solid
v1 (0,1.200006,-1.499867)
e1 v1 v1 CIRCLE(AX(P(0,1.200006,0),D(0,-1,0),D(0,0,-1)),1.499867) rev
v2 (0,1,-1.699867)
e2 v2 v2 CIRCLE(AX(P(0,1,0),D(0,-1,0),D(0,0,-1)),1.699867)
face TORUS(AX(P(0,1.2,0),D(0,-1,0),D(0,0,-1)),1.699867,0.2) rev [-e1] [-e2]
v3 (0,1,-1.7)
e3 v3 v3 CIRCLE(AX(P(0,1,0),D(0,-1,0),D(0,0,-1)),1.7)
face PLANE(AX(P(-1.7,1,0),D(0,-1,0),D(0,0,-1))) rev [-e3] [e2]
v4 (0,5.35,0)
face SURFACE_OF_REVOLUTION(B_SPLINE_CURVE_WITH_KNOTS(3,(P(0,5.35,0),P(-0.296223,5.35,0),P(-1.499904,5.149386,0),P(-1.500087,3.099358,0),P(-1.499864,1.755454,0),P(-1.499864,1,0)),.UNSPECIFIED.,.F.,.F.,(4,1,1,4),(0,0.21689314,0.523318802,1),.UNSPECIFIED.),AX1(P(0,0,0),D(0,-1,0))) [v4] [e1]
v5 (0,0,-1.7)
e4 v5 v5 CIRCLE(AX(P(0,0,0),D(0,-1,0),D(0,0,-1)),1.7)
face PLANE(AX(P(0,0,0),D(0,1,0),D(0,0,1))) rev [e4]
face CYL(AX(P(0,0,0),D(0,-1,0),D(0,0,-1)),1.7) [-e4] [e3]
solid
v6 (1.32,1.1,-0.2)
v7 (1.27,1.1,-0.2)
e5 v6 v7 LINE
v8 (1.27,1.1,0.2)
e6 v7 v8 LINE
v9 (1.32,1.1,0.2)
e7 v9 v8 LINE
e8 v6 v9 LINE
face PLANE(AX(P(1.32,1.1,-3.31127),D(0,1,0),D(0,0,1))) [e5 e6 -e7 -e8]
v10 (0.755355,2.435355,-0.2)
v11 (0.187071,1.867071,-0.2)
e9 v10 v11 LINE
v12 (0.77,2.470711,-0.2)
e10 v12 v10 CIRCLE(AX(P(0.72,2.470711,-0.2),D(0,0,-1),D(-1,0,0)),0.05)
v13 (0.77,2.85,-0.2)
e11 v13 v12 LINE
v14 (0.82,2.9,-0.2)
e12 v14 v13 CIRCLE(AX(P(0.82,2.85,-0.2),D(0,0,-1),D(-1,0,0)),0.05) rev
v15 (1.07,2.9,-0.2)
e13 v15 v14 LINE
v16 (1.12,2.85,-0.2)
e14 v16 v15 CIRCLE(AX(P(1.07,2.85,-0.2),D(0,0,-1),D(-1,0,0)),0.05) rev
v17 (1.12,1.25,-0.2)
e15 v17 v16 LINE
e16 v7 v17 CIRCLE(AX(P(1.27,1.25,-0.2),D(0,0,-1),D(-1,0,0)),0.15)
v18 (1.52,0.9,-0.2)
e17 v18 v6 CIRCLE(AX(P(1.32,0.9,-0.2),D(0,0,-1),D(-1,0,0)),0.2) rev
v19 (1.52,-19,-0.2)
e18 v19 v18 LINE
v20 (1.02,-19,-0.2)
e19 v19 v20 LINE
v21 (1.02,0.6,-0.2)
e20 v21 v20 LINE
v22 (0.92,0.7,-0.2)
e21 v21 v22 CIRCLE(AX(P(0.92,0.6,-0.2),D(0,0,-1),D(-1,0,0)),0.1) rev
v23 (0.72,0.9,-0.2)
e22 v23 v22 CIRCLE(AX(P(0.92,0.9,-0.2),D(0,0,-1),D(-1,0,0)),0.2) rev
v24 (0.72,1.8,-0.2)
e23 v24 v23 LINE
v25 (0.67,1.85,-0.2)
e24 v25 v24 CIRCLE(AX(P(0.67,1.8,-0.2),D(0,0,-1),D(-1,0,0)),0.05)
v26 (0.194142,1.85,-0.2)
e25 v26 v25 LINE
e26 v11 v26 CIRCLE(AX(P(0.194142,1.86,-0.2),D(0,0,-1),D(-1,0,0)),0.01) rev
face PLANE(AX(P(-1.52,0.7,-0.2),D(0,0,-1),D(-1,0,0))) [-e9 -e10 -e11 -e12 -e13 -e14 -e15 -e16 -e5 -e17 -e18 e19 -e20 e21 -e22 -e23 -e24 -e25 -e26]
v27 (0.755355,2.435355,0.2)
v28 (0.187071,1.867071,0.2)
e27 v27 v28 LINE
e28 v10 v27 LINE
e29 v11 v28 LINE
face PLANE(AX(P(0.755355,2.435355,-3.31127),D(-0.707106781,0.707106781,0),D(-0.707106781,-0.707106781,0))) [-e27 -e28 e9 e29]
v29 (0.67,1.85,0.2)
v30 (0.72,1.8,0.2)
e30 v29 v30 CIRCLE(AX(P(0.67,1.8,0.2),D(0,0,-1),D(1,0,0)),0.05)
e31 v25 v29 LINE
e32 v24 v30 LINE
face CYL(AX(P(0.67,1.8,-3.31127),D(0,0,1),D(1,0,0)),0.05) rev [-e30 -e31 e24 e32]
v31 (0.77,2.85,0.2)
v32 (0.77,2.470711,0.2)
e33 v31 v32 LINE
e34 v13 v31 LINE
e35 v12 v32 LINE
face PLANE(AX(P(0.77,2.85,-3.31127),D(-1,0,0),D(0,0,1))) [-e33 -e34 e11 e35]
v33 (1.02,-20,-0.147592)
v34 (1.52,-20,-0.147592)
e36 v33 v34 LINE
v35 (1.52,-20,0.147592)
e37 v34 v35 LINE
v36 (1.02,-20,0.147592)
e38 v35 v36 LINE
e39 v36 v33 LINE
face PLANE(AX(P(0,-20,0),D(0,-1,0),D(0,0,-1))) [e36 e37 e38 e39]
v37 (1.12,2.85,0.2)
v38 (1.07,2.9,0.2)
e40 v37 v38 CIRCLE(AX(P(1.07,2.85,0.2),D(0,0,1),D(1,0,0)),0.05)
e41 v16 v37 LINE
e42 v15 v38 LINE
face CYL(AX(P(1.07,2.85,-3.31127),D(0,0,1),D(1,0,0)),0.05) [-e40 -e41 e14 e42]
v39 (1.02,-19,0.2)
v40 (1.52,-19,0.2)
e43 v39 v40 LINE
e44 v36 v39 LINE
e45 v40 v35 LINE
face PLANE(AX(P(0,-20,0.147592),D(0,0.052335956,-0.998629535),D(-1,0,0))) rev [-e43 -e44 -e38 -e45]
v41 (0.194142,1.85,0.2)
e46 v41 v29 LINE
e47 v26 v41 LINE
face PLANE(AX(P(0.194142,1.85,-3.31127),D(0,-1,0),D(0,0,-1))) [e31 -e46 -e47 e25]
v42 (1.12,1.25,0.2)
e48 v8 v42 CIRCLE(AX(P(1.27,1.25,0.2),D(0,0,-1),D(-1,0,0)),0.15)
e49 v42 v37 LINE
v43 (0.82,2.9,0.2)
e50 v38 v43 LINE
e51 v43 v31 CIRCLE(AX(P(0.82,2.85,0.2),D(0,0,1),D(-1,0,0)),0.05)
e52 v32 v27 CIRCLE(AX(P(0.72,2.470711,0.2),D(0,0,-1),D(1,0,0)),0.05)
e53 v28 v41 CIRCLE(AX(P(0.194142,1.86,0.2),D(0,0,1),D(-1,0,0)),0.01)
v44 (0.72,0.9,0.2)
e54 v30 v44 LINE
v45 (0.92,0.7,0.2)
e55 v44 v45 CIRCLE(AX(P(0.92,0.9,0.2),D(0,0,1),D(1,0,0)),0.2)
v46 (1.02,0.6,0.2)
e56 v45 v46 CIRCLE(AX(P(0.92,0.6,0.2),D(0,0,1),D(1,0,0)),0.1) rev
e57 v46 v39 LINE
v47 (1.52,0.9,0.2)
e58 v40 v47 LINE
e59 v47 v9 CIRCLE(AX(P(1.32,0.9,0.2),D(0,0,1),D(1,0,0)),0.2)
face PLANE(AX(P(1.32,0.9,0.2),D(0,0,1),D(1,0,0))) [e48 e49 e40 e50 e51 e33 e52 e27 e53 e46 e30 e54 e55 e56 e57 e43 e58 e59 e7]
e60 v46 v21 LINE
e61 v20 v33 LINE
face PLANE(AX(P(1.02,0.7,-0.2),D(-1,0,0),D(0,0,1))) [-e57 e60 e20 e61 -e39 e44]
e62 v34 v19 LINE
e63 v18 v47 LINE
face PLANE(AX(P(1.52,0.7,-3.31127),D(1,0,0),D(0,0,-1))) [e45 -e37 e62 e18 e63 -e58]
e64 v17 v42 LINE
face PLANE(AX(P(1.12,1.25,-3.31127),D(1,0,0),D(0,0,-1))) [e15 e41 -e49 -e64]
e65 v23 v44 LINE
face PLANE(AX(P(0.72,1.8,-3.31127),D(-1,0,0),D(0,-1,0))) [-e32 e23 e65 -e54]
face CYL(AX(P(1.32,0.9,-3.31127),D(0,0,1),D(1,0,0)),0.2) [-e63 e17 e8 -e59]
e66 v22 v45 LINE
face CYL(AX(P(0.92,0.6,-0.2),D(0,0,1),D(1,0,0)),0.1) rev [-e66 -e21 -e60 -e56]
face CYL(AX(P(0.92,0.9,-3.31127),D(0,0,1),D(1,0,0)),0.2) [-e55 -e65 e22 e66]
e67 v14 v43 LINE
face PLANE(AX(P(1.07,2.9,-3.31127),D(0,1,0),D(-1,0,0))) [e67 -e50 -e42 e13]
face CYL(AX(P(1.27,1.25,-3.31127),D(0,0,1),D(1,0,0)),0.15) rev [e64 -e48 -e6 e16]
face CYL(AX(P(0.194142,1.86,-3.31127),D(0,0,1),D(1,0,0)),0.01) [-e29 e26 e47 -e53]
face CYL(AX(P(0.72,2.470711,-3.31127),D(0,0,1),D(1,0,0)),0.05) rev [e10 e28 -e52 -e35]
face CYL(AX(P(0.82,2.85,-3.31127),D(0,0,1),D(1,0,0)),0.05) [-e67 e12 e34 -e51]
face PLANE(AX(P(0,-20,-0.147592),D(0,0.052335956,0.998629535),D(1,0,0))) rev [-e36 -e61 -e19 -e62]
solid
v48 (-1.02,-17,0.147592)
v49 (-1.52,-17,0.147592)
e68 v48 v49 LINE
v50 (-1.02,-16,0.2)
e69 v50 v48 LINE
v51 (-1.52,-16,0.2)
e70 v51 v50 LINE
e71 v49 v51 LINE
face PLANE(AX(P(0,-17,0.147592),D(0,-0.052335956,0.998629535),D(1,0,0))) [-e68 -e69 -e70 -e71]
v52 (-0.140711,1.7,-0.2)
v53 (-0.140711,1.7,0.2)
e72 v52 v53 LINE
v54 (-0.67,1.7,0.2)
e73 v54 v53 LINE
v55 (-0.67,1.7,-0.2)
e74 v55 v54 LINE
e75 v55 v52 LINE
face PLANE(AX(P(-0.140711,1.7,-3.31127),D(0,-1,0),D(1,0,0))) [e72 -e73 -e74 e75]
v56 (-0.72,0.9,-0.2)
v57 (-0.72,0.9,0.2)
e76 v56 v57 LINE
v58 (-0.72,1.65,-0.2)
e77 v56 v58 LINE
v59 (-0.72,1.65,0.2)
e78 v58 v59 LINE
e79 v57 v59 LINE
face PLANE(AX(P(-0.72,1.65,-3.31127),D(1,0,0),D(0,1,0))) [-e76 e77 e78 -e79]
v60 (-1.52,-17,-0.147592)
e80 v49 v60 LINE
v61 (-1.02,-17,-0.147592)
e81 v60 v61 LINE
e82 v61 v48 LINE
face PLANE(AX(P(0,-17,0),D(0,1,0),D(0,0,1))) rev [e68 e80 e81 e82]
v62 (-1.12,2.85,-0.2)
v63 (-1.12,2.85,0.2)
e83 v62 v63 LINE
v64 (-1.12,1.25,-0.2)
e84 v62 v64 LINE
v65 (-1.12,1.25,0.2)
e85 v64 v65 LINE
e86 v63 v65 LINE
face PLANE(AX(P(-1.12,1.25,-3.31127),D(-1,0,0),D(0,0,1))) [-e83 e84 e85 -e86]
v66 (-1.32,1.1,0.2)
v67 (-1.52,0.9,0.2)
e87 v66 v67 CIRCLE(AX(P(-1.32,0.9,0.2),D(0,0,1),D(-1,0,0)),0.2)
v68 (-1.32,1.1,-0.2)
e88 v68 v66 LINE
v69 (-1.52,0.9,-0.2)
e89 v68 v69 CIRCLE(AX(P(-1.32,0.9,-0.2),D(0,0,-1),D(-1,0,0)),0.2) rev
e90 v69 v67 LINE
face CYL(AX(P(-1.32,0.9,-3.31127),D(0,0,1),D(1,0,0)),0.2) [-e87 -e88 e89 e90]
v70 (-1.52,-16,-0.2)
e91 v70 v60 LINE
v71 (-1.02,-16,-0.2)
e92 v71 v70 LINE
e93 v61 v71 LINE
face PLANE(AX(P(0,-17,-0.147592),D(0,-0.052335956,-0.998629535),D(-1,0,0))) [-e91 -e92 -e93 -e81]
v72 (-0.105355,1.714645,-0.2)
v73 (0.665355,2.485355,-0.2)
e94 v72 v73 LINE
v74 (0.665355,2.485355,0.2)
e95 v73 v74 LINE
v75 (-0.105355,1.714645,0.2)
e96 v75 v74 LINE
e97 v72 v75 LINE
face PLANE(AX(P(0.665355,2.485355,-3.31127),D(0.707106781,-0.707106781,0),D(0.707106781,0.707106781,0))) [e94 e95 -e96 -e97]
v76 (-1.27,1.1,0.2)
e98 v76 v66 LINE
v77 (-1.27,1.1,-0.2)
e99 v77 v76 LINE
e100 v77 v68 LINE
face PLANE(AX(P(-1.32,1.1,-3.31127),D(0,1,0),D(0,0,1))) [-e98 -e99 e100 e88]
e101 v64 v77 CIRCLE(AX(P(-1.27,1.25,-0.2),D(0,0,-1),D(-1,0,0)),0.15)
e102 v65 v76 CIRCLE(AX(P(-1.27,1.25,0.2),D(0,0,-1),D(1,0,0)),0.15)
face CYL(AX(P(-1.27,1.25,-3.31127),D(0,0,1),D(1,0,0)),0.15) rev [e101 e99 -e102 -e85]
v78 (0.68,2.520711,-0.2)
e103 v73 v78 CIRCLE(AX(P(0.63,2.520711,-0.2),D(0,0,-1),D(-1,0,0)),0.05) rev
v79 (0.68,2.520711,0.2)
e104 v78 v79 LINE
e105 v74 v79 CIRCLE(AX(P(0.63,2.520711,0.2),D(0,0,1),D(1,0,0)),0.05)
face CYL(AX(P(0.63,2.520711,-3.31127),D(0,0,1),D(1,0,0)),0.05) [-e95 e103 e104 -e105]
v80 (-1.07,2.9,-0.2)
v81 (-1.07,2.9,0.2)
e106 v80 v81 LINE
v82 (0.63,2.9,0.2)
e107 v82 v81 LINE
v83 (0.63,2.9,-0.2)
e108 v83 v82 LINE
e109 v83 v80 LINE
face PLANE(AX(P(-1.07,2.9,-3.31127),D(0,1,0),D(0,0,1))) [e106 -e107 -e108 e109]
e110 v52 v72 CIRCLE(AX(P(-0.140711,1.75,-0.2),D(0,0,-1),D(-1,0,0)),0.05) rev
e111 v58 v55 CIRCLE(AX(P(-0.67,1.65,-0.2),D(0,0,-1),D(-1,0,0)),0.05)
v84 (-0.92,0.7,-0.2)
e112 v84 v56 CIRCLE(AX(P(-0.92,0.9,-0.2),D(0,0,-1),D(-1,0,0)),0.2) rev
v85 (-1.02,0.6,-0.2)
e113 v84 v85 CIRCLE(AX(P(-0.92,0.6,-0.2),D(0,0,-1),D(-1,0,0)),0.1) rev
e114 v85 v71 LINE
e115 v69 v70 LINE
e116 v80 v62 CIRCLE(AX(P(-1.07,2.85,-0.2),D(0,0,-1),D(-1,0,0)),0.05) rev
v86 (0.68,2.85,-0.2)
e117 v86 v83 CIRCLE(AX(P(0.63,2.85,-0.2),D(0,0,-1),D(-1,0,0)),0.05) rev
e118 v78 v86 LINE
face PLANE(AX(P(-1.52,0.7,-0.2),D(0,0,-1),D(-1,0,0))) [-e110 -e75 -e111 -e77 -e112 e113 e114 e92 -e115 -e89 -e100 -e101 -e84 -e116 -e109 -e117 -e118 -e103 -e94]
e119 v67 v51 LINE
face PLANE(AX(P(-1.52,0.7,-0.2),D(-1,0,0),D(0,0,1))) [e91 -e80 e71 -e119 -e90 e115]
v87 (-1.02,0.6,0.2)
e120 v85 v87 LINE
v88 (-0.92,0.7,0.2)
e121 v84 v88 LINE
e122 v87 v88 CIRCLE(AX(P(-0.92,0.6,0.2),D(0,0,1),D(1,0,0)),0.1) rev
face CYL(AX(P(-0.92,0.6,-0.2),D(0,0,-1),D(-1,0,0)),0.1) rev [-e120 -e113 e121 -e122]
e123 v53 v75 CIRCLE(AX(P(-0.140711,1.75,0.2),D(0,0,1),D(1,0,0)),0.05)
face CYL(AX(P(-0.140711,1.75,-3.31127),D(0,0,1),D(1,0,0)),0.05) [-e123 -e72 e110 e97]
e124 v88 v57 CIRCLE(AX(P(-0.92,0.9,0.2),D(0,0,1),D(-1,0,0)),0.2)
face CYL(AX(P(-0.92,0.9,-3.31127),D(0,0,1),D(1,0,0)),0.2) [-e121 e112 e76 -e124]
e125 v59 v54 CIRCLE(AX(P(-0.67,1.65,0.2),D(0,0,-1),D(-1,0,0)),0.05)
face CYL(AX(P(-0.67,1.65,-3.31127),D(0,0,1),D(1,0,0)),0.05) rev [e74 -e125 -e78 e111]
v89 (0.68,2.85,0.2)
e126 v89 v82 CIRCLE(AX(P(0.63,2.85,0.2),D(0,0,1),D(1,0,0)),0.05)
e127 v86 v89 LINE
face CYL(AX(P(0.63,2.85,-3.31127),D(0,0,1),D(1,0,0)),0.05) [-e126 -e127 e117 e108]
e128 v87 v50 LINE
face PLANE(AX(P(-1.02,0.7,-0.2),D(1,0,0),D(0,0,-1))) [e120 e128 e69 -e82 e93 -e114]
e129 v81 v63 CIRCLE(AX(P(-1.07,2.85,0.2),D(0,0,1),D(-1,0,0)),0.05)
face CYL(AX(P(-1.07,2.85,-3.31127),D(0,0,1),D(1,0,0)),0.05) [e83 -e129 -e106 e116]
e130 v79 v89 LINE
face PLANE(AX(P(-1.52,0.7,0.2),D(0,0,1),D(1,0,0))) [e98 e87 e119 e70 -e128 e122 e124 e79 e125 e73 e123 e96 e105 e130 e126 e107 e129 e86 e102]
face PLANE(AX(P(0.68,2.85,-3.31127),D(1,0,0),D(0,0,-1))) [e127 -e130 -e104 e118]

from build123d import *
from OCP.BRepFilletAPI import BRepFilletAPI_MakeChamfer

# Parameters (mm, degrees)
FILLET1_R                  = 0.2
BOSS_EXTRUDE1_DEPTH        = 17
BOSS_EXTRUDE1_DEPTH_BACK   = 0.7
SKETCH2_W                  = 0.5
SKETCH2_H                  = 0.4
BOSS_EXTRUDE1_2_DEPTH      = 17
BOSS_EXTRUDE1_2_DEPTH_BACK = 0.7
SKETCH3_W                  = 0.5
SKETCH3_H                  = 0.4
BOSS_EXTRUDE2_DEPTH        = 3
CHAMFER1_SIZE              = 1
CHAMFER1_SIZE2             = 0.052407779
CHAMFER2_SIZE              = 1
CHAMFER2_SIZE2             = 0.052407779
BOSS_EXTRUDE3_DEPTH        = 0.4
BOSS_EXTRUDE3_2_DEPTH      = 0.4
FILLET2_R                  = 0.1
FILLET3_R                  = 0.1


with BuildPart() as part:
    # Sketch1 → Revolve2 (revolve)
    with BuildSketch(Plane.XY, mode=Mode.PRIVATE) as revolve2_sk:
        with BuildLine():
            Line((0, 0), (0, 5.35))
            add(Edge.make_bspline(
                [(0, 5.35), (-0.296223224, 5.35), (-1.499904297, 5.149386401), (-1.500087174, 3.099357507), (-1.49986439, 1.755454147), (-1.49986439, 1)],
                knots=[0, 0, 0, 0, 0.21689314, 0.523318802, 1, 1, 1, 1], degree=3))
            Line((-1.49986439, 1), (-1.7, 1))
            Line((-1.7, 1), (-1.7, 0))
            Line((-1.7, 0), (0, 0))
        make_face()
    revolve(revolve2_sk.sketch.rotate(Axis((0, 0, 0), (0, 1, 0)), 270), axis=Axis((0, 0, 0), (0, 1, 0)))

    # Fillet1
    fillet1_edges = [part.edges().sort_by_distance(p)[0] for p in [
        (0, 1, 1.49986439),
    ]]
    fillet(fillet1_edges, radius=FILLET1_R)


with BuildPart() as body_2:
    # Sketch2 → Boss-Extrude1 (new, two sides: drawn at the far end of the back side and taken through both)
    with BuildSketch(Plane.XZ.offset(-BOSS_EXTRUDE1_DEPTH_BACK)):
        with Locations((-1.27, 0)):
            Rectangle(SKETCH2_W, SKETCH2_H)
    extrude(amount=BOSS_EXTRUDE1_DEPTH + BOSS_EXTRUDE1_DEPTH_BACK)

    # Chamfer1: one chamfer whose edges measure the first distance from different faces: ONE call of the kernel's chamfer builder (chamfer() names one face for all edges)
    chamfer1_edges_1 = [body_2.edges().sort_by_distance(p)[0] for p in [
        (-1.27, -17, 0.2),
    ]]
    chamfer1_side_1 = [body_2.faces().sort_by_distance(p)[0] for p in [
        (-1.27, -8.15, 0.2),
    ]]
    chamfer1_edges_2 = [body_2.edges().sort_by_distance(p)[0] for p in [
        (-1.27, -17, -0.2),
    ]]
    chamfer1_side_2 = [body_2.faces().sort_by_distance(p)[0] for p in [
        (-1.27, -8.15, -0.2),
    ]]
    chamfer1 = BRepFilletAPI_MakeChamfer(body_2.part.solid().wrapped)
    for e in chamfer1_edges_1:
        chamfer1.Add(CHAMFER1_SIZE, CHAMFER1_SIZE2, e.wrapped, chamfer1_side_1[0].wrapped)  # the first distance lies on this face
    for e in chamfer1_edges_2:
        chamfer1.Add(CHAMFER1_SIZE, CHAMFER1_SIZE2, e.wrapped, chamfer1_side_2[0].wrapped)  # the first distance lies on this face
    add(Compound.cast(chamfer1.Shape()), mode=Mode.REPLACE)


with BuildPart() as body_3:
    # Sketch2 → Boss-Extrude1 2 (new, two sides: drawn at the far end of the back side and taken through both)
    with BuildSketch(Plane.XZ.offset(-BOSS_EXTRUDE1_2_DEPTH_BACK)):
        with Locations((1.27, 0)):
            Rectangle(SKETCH2_W, SKETCH2_H)
    extrude(amount=BOSS_EXTRUDE1_2_DEPTH + BOSS_EXTRUDE1_2_DEPTH_BACK)

    # Sketch3 → Boss-Extrude2 (add)
    with BuildSketch(Plane.XZ.offset(17)):
        with Locations((1.27, 0)):
            Rectangle(SKETCH3_W, SKETCH3_H)
    extrude(amount=BOSS_EXTRUDE2_DEPTH)

    # Chamfer2: one chamfer whose edges measure the first distance from different faces: ONE call of the kernel's chamfer builder (chamfer() names one face for all edges)
    chamfer2_edges_1 = [body_3.edges().sort_by_distance(p)[0] for p in [
        (1.27, -20, -0.2),
    ]]
    chamfer2_side_1 = [body_3.faces().sort_by_distance(p)[0] for p in [
        (1.27, -9.65, -0.2),
    ]]
    chamfer2_edges_2 = [body_3.edges().sort_by_distance(p)[0] for p in [
        (1.27, -20, 0.2),
    ]]
    chamfer2_side_2 = [body_3.faces().sort_by_distance(p)[0] for p in [
        (1.27, -9.65, 0.2),
    ]]
    chamfer2 = BRepFilletAPI_MakeChamfer(body_3.part.solid().wrapped)
    for e in chamfer2_edges_1:
        chamfer2.Add(CHAMFER2_SIZE, CHAMFER2_SIZE2, e.wrapped, chamfer2_side_1[0].wrapped)  # the first distance lies on this face
    for e in chamfer2_edges_2:
        chamfer2.Add(CHAMFER2_SIZE, CHAMFER2_SIZE2, e.wrapped, chamfer2_side_2[0].wrapped)  # the first distance lies on this face
    add(Compound.cast(chamfer2.Shape()), mode=Mode.REPLACE)


with BuildPart() as body_4:
    # Sketch4 → Boss-Extrude3 (new body)
    with BuildSketch(Plane.XY.offset(0.2)):
        with BuildLine():
            Line((-1.52, 0.7), (-1.52, 0.9))
            ThreePointArc((-1.52, 0.9), (-1.461421356, 1.041421356), (-1.32, 1.1))
            Line((-1.32, 1.1), (-1.27, 1.1))
            ThreePointArc((-1.27, 1.1), (-1.163933983, 1.143933983), (-1.12, 1.25))
            Line((-1.12, 1.25), (-1.12, 2.85))
            ThreePointArc((-1.12, 2.85), (-1.105355339, 2.885355339), (-1.07, 2.9))
            Line((-1.07, 2.9), (0.63, 2.9))
            ThreePointArc((0.63, 2.9), (0.665355339, 2.885355339), (0.68, 2.85))
            Line((0.68, 2.85), (0.68, 2.520710678))
            ThreePointArc((0.68, 2.520710678), (0.676193977, 2.501576507), (0.665355339, 2.485355339))
            Line((0.665355339, 2.485355339), (-0.105355339, 1.714644661))
            ThreePointArc((-0.105355339, 1.714644661), (-0.121576507, 1.703806023), (-0.140710678, 1.7))
            Line((-0.140710678, 1.7), (-0.67, 1.7))
            ThreePointArc((-0.67, 1.7), (-0.705355339, 1.685355339), (-0.72, 1.65))
            Line((-0.72, 1.65), (-0.72, 0.9))
            ThreePointArc((-0.72, 0.9), (-0.778578644, 0.758578644), (-0.92, 0.7))
            Line((-0.92, 0.7), (-1.52, 0.7))
        make_face()
    extrude(amount=-BOSS_EXTRUDE3_DEPTH)


with BuildPart() as body_5:
    # Sketch4 → Boss-Extrude3 2 (new body)
    with BuildSketch(Plane.XY.offset(0.2)):
        with BuildLine():
            Line((0.92, 0.7), (1.52, 0.7))
            Line((1.52, 0.7), (1.52, 0.9))
            ThreePointArc((1.52, 0.9), (1.461421356, 1.041421356), (1.32, 1.1))
            Line((1.32, 1.1), (1.27, 1.1))
            ThreePointArc((1.27, 1.1), (1.163933983, 1.143933983), (1.12, 1.25))
            Line((1.12, 1.25), (1.12, 2.85))
            ThreePointArc((1.12, 2.85), (1.105355339, 2.885355339), (1.07, 2.9))
            Line((1.07, 2.9), (0.82, 2.9))
            ThreePointArc((0.82, 2.9), (0.784644661, 2.885355339), (0.77, 2.85))
            Line((0.77, 2.85), (0.77, 2.470710678))
            ThreePointArc((0.77, 2.470710678), (0.766193977, 2.451576507), (0.755355339, 2.435355339))
            Line((0.755355339, 2.435355339), (0.187071068, 1.867071068))
            ThreePointArc((0.187071068, 1.867071068), (0.18490334, 1.856173166), (0.194142136, 1.85))
            Line((0.194142136, 1.85), (0.67, 1.85))
            ThreePointArc((0.67, 1.85), (0.705355339, 1.835355339), (0.72, 1.8))
            Line((0.72, 1.8), (0.72, 0.9))
            ThreePointArc((0.72, 0.9), (0.778578644, 0.758578644), (0.92, 0.7))
        make_face()
    extrude(amount=-BOSS_EXTRUDE3_2_DEPTH)

    # Combine2: union body 3
    add(body_3.part)

    # Fillet3
    fillet3_edges = [body_5.edges().sort_by_distance(p)[0] for p in [
        (1.02, 0.7, 0),
    ]]
    fillet(fillet3_edges, radius=FILLET3_R - 0.0001)  # a hair under: the kernel refuses the full size


with BuildPart() as body_2_1:
    add(body_2.part)

    # Combine1: union body 4
    add(body_4.part)

    # Fillet2
    fillet2_edges = [body_2_1.edges().sort_by_distance(p)[0] for p in [
        (-1.02, 0.7, 0),
    ]]
    fillet(fillet2_edges, radius=FILLET2_R - 0.0001)  # a hair under: the kernel refuses the full size


solid = Compound([part.part, body_5.part, body_2_1.part])
